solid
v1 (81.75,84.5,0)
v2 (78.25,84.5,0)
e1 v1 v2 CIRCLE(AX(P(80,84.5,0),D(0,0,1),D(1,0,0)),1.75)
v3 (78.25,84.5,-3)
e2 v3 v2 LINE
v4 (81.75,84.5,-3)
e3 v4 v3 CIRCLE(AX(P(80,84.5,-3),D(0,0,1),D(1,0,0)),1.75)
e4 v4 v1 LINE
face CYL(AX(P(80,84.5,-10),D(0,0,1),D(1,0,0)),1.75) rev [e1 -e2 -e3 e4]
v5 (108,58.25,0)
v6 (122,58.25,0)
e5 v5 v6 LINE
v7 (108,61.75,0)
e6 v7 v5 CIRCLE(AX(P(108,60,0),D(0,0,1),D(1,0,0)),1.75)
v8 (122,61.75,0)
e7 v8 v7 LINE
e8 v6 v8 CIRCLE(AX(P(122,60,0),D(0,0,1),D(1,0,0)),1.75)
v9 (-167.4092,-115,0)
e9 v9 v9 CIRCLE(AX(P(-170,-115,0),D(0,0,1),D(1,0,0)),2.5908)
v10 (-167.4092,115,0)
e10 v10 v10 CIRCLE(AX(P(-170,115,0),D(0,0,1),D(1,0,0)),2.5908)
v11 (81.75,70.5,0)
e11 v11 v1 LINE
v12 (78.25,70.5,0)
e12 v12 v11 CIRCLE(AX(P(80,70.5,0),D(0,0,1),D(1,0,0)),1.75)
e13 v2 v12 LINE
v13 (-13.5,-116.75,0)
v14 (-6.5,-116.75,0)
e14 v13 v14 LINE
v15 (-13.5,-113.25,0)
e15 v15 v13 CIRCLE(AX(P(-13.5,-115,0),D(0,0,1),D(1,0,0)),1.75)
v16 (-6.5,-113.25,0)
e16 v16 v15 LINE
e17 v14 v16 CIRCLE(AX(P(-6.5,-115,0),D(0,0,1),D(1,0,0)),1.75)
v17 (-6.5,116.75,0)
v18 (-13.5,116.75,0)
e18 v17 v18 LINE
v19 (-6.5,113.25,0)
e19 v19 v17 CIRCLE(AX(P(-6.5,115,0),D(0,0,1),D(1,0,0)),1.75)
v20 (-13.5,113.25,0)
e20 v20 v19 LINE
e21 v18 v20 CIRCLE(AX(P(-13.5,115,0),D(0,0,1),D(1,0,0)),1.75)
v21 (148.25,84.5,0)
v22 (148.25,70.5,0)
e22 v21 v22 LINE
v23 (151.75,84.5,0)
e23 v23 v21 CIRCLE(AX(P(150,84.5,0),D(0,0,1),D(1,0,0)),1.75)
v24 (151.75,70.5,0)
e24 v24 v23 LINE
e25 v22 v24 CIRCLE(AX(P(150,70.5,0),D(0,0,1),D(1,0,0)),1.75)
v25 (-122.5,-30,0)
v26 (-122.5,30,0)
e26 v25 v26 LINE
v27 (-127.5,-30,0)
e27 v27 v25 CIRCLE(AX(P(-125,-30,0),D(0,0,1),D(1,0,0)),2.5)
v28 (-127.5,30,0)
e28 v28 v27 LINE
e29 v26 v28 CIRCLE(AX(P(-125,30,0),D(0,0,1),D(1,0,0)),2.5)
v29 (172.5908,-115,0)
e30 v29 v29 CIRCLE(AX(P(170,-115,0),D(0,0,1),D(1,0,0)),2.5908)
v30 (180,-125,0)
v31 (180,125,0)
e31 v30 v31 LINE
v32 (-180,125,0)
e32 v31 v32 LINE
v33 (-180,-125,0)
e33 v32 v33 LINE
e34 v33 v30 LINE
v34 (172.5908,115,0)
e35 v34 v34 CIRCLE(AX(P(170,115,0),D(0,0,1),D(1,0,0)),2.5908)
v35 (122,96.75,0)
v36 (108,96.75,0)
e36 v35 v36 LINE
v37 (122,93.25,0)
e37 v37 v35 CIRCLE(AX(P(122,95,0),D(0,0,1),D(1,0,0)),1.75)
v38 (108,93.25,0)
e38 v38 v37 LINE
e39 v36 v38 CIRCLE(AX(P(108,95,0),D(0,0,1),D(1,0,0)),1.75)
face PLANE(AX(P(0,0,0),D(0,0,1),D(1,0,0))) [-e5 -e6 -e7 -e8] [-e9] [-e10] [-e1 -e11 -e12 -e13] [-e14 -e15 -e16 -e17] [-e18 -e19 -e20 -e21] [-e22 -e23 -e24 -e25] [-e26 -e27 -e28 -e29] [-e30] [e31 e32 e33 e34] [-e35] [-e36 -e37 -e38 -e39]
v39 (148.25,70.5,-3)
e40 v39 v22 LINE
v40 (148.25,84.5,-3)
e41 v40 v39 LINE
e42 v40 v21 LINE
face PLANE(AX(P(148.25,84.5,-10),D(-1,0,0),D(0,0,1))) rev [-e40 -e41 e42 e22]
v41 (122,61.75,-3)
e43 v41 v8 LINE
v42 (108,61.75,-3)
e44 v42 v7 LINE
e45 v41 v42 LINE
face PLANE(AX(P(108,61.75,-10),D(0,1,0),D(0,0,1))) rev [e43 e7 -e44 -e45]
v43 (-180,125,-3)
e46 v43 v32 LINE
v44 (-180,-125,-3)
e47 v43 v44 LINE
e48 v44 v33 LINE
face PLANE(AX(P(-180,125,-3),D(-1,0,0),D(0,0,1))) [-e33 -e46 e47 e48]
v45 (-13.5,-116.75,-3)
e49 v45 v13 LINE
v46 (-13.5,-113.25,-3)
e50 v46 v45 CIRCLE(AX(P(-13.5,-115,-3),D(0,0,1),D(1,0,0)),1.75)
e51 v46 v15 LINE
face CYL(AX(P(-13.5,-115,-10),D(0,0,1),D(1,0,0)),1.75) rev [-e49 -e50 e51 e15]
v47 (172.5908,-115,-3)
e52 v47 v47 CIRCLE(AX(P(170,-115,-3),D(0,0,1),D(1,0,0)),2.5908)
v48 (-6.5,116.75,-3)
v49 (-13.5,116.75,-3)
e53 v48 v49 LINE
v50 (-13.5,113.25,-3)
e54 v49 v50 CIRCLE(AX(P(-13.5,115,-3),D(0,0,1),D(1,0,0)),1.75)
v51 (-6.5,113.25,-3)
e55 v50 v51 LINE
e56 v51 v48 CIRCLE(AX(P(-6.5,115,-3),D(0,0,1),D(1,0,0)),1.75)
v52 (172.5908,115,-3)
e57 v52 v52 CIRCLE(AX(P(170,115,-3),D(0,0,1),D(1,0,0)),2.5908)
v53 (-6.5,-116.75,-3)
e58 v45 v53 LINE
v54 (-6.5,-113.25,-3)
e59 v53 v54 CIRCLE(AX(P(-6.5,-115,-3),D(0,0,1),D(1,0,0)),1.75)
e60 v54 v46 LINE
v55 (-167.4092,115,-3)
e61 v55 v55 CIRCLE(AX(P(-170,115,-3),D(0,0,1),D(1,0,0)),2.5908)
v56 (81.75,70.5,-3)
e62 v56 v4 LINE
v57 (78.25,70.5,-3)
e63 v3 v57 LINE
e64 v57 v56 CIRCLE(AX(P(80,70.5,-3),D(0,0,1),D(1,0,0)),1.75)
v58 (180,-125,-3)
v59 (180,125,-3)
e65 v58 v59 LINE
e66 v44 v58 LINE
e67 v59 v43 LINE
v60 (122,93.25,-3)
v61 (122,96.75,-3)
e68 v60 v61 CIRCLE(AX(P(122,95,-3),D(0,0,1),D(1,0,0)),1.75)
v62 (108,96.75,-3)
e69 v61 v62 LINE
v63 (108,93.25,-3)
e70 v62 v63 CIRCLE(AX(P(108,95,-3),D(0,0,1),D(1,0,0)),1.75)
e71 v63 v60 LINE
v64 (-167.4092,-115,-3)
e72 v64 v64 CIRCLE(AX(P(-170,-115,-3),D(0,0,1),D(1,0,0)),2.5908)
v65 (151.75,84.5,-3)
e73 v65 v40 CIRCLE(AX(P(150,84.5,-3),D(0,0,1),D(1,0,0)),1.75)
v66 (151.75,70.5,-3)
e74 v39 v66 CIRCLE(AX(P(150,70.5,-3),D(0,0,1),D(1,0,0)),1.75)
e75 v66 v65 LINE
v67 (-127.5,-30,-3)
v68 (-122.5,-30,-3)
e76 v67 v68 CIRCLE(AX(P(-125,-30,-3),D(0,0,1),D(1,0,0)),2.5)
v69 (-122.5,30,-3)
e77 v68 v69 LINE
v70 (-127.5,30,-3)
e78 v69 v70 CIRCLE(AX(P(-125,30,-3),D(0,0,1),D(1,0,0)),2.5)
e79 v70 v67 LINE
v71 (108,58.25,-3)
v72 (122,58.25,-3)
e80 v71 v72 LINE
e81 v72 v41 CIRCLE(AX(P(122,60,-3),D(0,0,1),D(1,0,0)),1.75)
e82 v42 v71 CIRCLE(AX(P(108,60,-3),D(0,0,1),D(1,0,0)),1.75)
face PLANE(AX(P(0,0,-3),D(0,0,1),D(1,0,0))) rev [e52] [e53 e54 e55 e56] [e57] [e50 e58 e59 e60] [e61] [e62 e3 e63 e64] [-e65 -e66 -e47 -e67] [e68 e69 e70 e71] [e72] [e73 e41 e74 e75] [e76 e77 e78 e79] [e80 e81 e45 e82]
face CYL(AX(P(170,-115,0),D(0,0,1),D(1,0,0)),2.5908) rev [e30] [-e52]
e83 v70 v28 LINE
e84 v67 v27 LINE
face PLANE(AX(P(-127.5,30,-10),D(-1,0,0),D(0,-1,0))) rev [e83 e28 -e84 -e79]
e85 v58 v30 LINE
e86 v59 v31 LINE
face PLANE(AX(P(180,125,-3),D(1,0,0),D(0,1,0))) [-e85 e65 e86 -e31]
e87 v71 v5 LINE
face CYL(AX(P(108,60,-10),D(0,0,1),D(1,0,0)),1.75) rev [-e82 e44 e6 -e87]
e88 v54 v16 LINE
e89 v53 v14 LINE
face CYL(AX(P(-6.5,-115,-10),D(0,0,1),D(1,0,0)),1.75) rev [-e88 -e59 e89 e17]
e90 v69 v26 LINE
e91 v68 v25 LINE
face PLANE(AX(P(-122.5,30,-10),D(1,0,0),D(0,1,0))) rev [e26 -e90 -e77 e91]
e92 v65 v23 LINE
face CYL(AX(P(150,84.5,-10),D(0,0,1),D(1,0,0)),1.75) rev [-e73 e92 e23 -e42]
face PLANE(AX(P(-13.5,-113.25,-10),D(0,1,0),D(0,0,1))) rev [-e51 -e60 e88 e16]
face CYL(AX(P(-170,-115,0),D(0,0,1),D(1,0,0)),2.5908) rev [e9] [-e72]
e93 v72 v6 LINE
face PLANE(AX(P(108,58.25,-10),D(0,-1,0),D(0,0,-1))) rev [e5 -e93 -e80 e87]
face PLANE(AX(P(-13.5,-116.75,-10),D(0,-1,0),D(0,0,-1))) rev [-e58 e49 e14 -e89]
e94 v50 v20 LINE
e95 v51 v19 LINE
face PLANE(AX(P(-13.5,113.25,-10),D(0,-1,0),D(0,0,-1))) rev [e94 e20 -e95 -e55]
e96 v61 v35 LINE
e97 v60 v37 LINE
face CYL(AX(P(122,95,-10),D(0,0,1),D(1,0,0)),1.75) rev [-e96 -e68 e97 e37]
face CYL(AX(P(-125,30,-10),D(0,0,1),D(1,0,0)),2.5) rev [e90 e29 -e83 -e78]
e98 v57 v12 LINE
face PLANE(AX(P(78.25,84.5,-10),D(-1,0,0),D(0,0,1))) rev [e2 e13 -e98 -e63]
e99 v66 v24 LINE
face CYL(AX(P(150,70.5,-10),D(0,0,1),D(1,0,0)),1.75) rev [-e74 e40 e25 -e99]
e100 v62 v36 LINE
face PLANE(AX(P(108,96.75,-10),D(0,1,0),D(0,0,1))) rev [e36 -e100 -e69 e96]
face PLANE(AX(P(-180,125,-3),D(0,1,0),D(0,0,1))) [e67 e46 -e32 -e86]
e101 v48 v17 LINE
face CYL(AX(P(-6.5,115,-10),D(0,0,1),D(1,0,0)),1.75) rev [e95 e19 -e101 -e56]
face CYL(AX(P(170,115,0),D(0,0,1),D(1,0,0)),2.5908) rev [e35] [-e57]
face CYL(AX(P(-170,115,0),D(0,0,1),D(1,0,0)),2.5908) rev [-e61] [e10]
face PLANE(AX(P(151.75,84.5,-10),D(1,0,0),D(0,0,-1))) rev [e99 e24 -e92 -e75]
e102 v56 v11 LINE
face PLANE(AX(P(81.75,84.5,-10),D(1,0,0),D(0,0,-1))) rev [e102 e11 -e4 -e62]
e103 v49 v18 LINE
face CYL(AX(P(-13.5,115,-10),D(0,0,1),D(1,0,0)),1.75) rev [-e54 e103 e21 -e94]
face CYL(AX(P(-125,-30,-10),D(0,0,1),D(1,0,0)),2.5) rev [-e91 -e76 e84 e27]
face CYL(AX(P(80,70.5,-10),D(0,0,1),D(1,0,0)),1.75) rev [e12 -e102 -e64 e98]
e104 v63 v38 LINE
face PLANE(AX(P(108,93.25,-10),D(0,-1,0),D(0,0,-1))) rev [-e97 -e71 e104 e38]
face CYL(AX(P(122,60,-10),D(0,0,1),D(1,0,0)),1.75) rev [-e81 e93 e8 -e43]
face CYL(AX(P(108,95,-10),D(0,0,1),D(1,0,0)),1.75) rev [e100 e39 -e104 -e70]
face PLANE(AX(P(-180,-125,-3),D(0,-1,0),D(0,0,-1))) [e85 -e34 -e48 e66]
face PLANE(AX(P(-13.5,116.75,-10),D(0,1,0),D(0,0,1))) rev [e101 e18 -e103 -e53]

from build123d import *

# Parameters (mm, degrees)
SKETCH1_W                  = 360
SKETCH1_H                  = 250
BASE_FLANGE1_DEPTH         = 3
F_6_0_204_DIAMETER_SLOT1_D = 5.1816
CUT_EXTRUDE1_DEPTH         = 10
CUT_EXTRUDE2_DEPTH         = 10
CUT_EXTRUDE4_DEPTH         = 10
CUT_EXTRUDE5_DEPTH         = 10
CUT_EXTRUDE6_DEPTH         = 10
CUT_EXTRUDE7_DEPTH         = 10
CUT_EXTRUDE8_DEPTH         = 10


# Sheet-metal steps are written as plain solids
with BuildPart() as part:
    # Sketch1 → Base-Flange1 (new body)
    with BuildSketch(Plane.XY):
        Rectangle(SKETCH1_W, SKETCH1_H)
    extrude(amount=-BASE_FLANGE1_DEPTH)

    # #6 (0.204) Diameter Slot1 (through all)
    with Locations(Plane.XY):
        with Locations((-170, -115), (-170, 115), (170, 115), (170, -115)):
            Hole(F_6_0_204_DIAMETER_SLOT1_D / 2)

    # Sketch8 → Cut-Extrude1 (cut)
    with BuildSketch(Plane.XY):
        with BuildLine():
            Line((-13.5, -113.25), (-6.5, -113.25))
            ThreePointArc((-6.5, -113.25), (-4.75, -115), (-6.5, -116.75))
            Line((-6.5, -116.75), (-13.5, -116.75))
            ThreePointArc((-13.5, -116.75), (-15.25, -115), (-13.5, -113.25))
        make_face()
    extrude(amount=-CUT_EXTRUDE1_DEPTH, mode=Mode.SUBTRACT)

    # Sketch9 → Cut-Extrude2 (cut)
    with BuildSketch(Plane.XY):
        with BuildLine():
            Line((-13.5, 116.75), (-6.5, 116.75))
            ThreePointArc((-6.5, 116.75), (-4.75, 115), (-6.5, 113.25))
            Line((-6.5, 113.25), (-13.5, 113.25))
            ThreePointArc((-13.5, 113.25), (-15.25, 115), (-13.5, 116.75))
        make_face()
    extrude(amount=-CUT_EXTRUDE2_DEPTH, mode=Mode.SUBTRACT)

    # Sketch10 → Cut-Extrude4 (cut)
    with BuildSketch(Plane.XY):
        with BuildLine():
            Line((151.75, 84.5), (151.75, 70.5))
            ThreePointArc((151.75, 70.5), (150, 68.75), (148.25, 70.5))
            Line((148.25, 70.5), (148.25, 84.5))
            ThreePointArc((148.25, 84.5), (150, 86.25), (151.75, 84.5))
        make_face()
    extrude(amount=-CUT_EXTRUDE4_DEPTH, mode=Mode.SUBTRACT)

    # Sketch11 → Cut-Extrude5 (cut)
    with BuildSketch(Plane.XY):
        with BuildLine():
            Line((108, 96.75), (122, 96.75))
            ThreePointArc((122, 96.75), (123.75, 95), (122, 93.25))
            Line((122, 93.25), (108, 93.25))
            ThreePointArc((108, 93.25), (106.25, 95), (108, 96.75))
        make_face()
    extrude(amount=-CUT_EXTRUDE5_DEPTH, mode=Mode.SUBTRACT)

    # Sketch12 → Cut-Extrude6 (cut)
    with BuildSketch(Plane.XY):
        with BuildLine():
            Line((108, 61.75), (122, 61.75))
            ThreePointArc((122, 61.75), (123.75, 60), (122, 58.25))
            Line((122, 58.25), (108, 58.25))
            ThreePointArc((108, 58.25), (106.25, 60), (108, 61.75))
        make_face()
    extrude(amount=-CUT_EXTRUDE6_DEPTH, mode=Mode.SUBTRACT)

    # Sketch13 → Cut-Extrude7 (cut)
    with BuildSketch(Plane.XY):
        with BuildLine():
            Line((81.75, 84.5), (81.75, 70.5))
            ThreePointArc((81.75, 70.5), (80, 68.75), (78.25, 70.5))
            Line((78.25, 70.5), (78.25, 84.5))
            ThreePointArc((78.25, 84.5), (80, 86.25), (81.75, 84.5))
        make_face()
    extrude(amount=-CUT_EXTRUDE7_DEPTH, mode=Mode.SUBTRACT)

    # Sketch14 → Cut-Extrude8 (cut)
    with BuildSketch(Plane.XY):
        with BuildLine():
            Line((-122.5, 30), (-122.5, -30))
            ThreePointArc((-122.5, -30), (-125, -32.5), (-127.5, -30))
            Line((-127.5, -30), (-127.5, 30))
            ThreePointArc((-127.5, 30), (-125, 32.5), (-122.5, 30))
        make_face()
    extrude(amount=-CUT_EXTRUDE8_DEPTH, mode=Mode.SUBTRACT)


solid = part.part
